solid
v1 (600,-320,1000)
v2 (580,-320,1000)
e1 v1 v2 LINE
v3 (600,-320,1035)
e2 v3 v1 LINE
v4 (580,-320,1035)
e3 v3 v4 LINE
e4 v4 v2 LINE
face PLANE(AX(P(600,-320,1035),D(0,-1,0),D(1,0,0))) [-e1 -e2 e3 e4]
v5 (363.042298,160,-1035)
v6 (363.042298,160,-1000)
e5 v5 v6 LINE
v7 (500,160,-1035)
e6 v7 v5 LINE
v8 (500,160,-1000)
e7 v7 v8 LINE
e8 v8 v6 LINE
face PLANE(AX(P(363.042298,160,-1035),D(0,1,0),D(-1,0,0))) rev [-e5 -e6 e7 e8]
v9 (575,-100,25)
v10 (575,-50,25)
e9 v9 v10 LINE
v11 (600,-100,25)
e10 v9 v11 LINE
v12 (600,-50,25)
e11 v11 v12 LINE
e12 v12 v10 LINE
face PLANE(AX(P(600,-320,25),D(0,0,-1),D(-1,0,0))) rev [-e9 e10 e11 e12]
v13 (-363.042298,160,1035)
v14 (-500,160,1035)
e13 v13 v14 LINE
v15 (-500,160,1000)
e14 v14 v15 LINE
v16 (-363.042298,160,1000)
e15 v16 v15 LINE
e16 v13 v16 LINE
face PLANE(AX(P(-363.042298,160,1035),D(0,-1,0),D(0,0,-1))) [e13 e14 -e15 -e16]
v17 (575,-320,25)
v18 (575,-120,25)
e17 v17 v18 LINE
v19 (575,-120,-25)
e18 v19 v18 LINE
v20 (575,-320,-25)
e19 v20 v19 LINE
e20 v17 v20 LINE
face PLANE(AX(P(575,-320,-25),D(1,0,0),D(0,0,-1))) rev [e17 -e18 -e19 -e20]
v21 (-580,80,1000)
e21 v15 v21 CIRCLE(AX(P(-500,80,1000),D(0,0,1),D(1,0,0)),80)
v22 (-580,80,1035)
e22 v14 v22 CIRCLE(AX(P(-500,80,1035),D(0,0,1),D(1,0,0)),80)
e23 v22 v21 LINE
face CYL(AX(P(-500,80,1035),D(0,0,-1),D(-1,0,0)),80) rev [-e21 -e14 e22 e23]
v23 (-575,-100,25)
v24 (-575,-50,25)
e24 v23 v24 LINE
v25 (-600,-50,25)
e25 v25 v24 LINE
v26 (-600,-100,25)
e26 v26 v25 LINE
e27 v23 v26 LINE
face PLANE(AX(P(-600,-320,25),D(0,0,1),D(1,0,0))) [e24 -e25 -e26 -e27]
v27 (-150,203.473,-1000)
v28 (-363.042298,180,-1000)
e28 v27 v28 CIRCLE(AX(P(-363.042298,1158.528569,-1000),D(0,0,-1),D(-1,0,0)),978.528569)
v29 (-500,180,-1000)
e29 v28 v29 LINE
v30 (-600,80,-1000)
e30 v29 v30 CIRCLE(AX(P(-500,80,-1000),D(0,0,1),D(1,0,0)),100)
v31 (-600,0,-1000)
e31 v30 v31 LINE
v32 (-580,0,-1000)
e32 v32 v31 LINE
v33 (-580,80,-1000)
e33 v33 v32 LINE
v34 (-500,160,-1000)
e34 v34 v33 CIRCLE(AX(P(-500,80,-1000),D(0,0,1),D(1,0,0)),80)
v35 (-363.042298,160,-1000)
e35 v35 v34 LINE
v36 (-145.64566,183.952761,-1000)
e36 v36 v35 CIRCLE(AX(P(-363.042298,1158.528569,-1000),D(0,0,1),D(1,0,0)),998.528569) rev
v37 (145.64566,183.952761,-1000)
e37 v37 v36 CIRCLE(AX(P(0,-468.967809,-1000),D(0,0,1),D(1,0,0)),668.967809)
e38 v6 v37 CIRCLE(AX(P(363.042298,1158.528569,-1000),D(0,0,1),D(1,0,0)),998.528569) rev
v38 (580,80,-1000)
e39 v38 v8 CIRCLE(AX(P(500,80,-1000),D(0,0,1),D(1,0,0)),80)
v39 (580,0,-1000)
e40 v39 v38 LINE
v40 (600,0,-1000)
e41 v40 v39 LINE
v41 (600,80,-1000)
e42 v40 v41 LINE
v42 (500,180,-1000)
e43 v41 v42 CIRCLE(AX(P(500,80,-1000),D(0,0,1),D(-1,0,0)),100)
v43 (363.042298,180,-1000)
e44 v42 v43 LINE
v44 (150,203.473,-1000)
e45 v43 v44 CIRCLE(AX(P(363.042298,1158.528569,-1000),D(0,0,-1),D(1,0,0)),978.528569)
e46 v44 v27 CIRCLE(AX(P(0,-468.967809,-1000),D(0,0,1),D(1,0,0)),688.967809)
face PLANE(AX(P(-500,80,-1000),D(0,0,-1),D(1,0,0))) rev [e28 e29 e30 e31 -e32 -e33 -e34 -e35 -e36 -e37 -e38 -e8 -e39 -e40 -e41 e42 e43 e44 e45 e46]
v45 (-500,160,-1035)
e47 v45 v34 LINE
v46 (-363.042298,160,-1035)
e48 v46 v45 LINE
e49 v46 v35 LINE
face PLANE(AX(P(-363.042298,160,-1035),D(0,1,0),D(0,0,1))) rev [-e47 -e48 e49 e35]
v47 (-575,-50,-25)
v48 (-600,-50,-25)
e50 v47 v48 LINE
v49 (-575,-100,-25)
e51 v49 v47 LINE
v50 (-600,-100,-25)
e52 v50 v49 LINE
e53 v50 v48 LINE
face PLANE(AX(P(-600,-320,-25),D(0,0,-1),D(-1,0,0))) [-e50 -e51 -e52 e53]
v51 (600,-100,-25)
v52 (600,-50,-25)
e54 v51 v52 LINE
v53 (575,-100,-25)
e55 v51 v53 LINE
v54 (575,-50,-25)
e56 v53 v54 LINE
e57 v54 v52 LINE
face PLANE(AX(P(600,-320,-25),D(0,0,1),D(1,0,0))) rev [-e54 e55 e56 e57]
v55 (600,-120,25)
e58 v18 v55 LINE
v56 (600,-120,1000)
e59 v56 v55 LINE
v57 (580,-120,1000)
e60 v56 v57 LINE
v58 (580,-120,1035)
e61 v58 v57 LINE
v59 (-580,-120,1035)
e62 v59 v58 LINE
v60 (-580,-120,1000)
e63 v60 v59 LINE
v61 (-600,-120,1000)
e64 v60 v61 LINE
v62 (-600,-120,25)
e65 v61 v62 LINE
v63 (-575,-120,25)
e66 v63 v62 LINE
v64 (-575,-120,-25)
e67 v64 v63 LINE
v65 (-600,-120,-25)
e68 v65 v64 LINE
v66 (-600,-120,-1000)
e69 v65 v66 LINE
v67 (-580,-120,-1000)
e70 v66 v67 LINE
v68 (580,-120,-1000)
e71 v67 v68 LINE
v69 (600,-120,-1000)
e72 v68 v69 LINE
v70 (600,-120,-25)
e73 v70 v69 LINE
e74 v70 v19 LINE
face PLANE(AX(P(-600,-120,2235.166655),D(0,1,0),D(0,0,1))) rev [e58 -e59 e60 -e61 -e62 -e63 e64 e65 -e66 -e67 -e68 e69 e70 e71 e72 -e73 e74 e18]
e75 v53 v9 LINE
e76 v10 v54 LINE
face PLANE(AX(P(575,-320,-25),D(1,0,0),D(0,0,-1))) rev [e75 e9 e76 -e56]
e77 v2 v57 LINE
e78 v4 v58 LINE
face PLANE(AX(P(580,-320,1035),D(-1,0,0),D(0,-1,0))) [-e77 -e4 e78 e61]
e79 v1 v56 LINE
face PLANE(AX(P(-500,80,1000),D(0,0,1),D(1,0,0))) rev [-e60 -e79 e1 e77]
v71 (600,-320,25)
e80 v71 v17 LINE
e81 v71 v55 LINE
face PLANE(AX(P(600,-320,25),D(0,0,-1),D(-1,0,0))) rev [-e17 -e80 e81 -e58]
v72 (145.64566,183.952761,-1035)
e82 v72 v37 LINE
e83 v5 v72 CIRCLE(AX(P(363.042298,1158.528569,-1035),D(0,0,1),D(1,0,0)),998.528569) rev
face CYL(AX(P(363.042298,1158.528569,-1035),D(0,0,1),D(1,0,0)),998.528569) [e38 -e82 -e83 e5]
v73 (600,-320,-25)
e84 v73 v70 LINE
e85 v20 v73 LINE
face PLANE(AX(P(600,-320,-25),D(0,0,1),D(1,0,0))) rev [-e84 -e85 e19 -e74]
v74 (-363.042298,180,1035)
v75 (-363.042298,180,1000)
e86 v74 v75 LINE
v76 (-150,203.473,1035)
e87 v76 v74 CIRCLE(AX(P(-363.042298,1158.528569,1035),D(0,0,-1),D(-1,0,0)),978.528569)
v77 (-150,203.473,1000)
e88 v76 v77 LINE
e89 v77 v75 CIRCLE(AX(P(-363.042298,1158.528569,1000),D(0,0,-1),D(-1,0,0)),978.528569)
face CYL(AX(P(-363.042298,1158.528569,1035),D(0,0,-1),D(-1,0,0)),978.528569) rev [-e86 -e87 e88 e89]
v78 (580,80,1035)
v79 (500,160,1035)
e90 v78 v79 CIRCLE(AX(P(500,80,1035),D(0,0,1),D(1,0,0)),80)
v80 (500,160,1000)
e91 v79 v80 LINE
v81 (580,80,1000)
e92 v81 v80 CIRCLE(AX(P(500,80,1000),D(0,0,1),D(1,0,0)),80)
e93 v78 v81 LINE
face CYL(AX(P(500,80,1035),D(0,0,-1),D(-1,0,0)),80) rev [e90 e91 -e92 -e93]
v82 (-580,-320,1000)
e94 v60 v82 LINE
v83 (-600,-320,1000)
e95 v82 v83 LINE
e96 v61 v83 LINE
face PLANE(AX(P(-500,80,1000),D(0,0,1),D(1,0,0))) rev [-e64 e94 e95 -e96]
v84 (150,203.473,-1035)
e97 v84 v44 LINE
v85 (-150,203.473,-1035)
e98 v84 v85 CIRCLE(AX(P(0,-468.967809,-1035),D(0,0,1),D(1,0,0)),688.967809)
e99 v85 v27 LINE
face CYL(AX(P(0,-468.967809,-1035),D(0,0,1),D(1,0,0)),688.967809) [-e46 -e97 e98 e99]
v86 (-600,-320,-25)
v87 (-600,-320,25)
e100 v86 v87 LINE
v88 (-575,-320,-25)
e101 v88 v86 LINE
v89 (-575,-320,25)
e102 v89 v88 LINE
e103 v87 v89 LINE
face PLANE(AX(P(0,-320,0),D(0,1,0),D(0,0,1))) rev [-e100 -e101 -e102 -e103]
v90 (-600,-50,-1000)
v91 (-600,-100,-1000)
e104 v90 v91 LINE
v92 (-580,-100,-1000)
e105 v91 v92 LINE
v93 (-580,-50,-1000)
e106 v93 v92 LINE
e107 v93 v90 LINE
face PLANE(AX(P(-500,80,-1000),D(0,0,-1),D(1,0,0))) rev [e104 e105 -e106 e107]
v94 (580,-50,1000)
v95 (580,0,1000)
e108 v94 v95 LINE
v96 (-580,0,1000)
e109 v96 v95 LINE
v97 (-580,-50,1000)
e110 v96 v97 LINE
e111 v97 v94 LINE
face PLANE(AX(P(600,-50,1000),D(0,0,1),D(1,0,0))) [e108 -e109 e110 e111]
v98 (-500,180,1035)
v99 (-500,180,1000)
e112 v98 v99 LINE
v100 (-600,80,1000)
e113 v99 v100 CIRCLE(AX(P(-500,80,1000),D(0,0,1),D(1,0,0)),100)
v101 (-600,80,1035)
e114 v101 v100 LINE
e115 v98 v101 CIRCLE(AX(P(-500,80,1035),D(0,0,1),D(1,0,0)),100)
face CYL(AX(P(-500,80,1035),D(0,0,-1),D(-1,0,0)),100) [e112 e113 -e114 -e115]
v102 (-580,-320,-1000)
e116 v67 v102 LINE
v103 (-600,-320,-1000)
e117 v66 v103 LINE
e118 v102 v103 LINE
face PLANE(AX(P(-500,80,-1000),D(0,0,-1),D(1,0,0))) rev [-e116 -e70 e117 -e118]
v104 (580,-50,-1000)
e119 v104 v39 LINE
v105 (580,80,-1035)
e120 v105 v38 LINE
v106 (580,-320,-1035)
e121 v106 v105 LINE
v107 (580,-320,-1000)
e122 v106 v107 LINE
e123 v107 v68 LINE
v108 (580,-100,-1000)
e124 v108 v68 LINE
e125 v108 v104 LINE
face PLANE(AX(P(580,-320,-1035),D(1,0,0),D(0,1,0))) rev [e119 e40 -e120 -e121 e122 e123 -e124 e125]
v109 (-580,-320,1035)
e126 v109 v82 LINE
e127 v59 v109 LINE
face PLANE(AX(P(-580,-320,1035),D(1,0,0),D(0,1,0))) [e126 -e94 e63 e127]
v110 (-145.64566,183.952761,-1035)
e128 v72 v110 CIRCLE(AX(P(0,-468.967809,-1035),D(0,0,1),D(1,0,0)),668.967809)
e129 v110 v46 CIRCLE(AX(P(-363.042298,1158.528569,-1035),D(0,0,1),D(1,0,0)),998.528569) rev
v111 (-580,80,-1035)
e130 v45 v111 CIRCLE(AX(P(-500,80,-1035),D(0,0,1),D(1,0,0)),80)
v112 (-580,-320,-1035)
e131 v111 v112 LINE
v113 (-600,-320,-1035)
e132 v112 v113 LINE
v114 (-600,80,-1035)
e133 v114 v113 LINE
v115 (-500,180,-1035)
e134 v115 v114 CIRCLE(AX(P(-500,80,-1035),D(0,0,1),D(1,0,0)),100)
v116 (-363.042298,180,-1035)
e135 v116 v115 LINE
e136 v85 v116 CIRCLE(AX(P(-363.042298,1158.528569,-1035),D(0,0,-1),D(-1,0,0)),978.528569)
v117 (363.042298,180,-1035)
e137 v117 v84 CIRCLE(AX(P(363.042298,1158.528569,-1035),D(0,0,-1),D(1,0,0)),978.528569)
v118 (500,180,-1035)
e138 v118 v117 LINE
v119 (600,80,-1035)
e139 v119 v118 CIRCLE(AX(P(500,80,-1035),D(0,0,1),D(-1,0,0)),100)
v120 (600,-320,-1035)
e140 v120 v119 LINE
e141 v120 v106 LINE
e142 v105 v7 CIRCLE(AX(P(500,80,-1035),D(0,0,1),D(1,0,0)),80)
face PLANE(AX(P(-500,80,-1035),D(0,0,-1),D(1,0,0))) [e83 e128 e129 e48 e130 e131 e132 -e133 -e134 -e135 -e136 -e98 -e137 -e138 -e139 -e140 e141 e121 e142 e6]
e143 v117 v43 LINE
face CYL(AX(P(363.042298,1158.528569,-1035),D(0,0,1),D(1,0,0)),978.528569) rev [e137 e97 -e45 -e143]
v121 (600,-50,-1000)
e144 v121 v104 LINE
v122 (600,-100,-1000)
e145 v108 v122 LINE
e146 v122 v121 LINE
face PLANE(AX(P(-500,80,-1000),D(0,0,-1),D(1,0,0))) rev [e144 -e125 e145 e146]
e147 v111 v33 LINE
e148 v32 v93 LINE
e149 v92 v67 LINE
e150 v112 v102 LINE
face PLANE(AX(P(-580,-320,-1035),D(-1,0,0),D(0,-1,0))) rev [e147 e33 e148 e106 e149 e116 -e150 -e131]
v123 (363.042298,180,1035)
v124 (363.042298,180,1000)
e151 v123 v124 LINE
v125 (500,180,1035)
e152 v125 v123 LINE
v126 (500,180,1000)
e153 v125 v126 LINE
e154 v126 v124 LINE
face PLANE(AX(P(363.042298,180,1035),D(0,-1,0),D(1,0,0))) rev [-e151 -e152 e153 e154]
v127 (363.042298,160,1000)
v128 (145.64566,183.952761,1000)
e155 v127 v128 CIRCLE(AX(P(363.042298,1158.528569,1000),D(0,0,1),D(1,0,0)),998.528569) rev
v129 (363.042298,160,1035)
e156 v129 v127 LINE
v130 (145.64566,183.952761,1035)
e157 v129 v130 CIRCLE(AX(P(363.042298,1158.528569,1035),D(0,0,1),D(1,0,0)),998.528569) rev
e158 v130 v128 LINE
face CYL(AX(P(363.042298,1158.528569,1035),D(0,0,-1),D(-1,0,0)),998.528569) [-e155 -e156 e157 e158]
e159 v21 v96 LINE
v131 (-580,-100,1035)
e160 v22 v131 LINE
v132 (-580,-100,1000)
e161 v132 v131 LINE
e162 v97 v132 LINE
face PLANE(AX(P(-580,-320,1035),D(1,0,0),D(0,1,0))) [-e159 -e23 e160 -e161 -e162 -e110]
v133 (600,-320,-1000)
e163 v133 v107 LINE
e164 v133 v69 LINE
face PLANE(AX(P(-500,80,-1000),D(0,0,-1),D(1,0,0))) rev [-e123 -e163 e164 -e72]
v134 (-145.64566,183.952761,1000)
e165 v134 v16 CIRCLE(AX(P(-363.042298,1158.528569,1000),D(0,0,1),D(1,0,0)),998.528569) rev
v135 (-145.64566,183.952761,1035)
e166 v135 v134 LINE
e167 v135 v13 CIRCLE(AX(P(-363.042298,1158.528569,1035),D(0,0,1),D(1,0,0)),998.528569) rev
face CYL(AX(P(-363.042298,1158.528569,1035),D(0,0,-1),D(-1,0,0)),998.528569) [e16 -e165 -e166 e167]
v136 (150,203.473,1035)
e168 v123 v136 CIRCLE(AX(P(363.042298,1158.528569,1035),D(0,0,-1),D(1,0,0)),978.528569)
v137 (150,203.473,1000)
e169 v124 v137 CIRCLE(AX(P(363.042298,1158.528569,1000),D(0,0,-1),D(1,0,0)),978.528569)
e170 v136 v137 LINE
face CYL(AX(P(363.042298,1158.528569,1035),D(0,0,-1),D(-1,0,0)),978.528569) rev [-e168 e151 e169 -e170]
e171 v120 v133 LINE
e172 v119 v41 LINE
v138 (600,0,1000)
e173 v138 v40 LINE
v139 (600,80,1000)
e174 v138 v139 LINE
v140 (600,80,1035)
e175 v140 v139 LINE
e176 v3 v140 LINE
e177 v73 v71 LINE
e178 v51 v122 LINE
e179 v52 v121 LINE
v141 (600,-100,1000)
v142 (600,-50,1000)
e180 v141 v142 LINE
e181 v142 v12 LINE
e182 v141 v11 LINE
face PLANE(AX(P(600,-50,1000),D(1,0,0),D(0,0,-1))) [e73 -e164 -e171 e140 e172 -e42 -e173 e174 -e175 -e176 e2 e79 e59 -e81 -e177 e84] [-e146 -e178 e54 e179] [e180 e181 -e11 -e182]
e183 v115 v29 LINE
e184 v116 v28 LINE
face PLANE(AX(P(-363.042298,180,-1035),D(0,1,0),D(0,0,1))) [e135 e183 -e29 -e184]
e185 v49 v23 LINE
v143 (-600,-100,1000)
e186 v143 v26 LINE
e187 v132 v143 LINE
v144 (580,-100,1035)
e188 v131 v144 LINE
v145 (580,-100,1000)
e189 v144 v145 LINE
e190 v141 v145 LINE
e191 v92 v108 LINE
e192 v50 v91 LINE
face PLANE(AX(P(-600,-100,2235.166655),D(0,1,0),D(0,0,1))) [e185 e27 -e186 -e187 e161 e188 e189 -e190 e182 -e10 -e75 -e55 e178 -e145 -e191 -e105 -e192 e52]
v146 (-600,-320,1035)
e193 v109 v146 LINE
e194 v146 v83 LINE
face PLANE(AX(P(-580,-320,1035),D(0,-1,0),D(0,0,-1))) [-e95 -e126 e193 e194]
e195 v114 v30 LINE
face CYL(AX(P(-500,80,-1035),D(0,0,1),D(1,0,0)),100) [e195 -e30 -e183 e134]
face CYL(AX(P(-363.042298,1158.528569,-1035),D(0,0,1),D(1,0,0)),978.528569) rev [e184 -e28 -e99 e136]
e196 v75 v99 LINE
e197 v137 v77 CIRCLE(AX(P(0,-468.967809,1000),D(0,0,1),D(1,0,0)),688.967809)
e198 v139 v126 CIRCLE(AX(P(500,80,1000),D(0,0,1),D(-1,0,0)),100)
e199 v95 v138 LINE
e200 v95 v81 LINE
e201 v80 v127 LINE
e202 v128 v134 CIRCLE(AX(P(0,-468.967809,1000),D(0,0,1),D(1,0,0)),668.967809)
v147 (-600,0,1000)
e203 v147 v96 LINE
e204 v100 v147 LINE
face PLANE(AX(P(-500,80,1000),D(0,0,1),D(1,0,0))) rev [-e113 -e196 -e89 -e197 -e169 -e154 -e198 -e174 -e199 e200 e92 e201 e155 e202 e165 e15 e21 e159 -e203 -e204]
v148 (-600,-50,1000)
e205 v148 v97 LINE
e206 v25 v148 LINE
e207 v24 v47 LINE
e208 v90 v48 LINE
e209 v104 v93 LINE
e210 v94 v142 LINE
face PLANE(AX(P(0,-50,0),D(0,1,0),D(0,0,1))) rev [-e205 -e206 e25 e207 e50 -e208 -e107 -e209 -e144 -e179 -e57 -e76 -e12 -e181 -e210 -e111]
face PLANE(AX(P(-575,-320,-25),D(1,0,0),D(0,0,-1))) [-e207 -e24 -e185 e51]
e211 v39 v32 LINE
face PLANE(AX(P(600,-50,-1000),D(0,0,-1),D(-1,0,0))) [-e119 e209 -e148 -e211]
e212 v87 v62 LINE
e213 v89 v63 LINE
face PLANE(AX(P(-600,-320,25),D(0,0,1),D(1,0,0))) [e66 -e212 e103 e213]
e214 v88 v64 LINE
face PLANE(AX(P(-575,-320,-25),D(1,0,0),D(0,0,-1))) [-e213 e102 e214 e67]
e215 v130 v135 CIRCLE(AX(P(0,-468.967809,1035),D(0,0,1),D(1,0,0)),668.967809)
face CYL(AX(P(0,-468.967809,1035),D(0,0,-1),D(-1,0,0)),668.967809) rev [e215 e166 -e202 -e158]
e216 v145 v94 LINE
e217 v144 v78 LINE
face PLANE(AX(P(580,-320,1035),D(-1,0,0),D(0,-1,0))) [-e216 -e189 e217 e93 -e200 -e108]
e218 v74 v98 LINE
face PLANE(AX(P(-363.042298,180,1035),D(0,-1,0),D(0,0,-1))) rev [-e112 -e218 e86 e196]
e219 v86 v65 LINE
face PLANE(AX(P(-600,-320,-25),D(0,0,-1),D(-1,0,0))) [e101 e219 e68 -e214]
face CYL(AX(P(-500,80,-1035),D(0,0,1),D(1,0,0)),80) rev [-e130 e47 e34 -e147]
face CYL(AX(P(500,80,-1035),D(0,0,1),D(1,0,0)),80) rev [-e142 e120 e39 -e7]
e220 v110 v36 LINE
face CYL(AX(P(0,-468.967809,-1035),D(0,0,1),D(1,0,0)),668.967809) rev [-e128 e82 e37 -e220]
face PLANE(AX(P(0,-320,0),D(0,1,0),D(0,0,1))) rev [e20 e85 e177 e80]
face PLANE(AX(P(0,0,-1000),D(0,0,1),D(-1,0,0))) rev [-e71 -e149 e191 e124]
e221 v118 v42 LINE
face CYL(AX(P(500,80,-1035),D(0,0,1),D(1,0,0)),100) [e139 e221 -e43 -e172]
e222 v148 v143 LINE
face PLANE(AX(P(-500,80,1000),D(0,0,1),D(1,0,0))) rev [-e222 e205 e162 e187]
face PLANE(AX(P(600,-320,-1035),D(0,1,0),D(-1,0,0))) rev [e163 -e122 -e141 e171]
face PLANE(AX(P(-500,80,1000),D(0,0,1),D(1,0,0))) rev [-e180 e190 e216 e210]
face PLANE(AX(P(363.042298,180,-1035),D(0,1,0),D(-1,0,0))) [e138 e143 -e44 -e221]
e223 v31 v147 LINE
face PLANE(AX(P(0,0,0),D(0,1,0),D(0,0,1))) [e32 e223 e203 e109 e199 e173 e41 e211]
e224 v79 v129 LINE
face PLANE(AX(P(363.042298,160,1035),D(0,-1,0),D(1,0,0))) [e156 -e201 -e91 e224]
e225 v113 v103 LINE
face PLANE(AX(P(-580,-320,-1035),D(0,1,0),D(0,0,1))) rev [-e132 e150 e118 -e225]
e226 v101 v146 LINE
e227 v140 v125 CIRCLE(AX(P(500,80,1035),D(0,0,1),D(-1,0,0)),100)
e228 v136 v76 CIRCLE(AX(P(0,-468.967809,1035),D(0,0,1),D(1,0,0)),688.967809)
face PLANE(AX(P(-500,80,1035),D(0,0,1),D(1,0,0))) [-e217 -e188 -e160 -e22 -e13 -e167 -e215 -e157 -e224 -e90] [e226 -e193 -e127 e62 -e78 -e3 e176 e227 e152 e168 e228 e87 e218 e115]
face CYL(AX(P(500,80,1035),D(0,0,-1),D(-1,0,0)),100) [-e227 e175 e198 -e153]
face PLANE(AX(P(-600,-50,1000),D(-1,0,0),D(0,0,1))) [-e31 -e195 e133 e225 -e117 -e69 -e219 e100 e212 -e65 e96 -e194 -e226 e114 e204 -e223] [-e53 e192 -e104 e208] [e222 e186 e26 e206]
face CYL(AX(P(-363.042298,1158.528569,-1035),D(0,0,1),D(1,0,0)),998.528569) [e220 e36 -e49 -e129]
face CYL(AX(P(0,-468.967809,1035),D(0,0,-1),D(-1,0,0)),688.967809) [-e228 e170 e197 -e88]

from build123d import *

# Parameters (mm, degrees)
SKETCH_1_W         = 1200
SKETCH_1_H         = 2000
EXTRUDE_1_DEPTH    = 50
SKETCH_2_W         = 25
SKETCH_2_H         = 50
EXTRUDE_2_DEPTH    = 320
EXTRUDE_1_2_DEPTH  = 35
SKETCH_4_W         = 1200
SKETCH_4_H         = 20
EXTRUDE_3_DEPTH    = 35
MIRROR_START       = -1000
MIRROR_2_OUTLINE_W = 1200
MIRROR_2_OUTLINE_H = 20
MIRROR_2_DEPTH     = 2000
MIRROR_START_2     = -1035
MIRROR_2_2_DEPTH   = 35


# Read off the part's stored shape, not the designer's step: 镜向2
with BuildPart() as part:
    # 草图1 → Extrude 1 (new body)
    with BuildSketch(Plane(origin=(0, 0, 0), x_dir=(1, 0, 0), z_dir=(0, 1, 0))):
        Rectangle(SKETCH_1_W, SKETCH_1_H)
    extrude(amount=-EXTRUDE_1_DEPTH)

    # 草图2 → 凸台-拉伸2 (add)
    with BuildSketch(Plane(origin=(0, 0, 0), x_dir=(1, 0, 0), z_dir=(0, 1, 0))):
        with Locations((-587.5, 0)):
            Rectangle(SKETCH_2_W, SKETCH_2_H)
    extrude_2 = extrude(amount=-EXTRUDE_2_DEPTH)

    # 镜向1: 凸台-拉伸2 across plane
    add(extrude_2.mirror(Plane(origin=(0, 0, 0), x_dir=(0, 0, 1), z_dir=(1, 0, 0))))

    # 草图3 → Extrude 1 2 (add)
    with BuildSketch(Plane.XY.offset(1000)):
        with BuildLine():
            Line((-600, -320), (-600, 80))
            ThreePointArc((-600, 80), (-570.710678119, 150.710678119), (-500, 180))
            Line((-500, 180), (-363.0422981, 180))
            ThreePointArc((-363.0422981, 180), (-255.876535707, 185.885952353), (-150, 203.473000167))
            ThreePointArc((-150, 203.473000167), (0, 220), (150, 203.473000167))
            ThreePointArc((150, 203.473000167), (255.876535707, 185.885952353), (363.0422981, 180))
            Line((363.0422981, 180), (500, 180))
            ThreePointArc((500, 180), (570.710678119, 150.710678119), (600, 80))
            Line((600, 80), (600, -320))
            Line((600, -320), (580, -320))
            Line((580, -320), (580, 80))
            ThreePointArc((580, 80), (556.568542495, 136.568542495), (500, 160))
            Line((500, 160), (363.0422981, 160))
            ThreePointArc((363.0422981, 160), (253.686190615, 166.006254459), (145.645660129, 183.952761329))
            ThreePointArc((145.645660129, 183.952761329), (0, 200), (-145.645660129, 183.952761329))
            ThreePointArc((-145.645660129, 183.952761329), (-253.686190615, 166.006254459), (-363.0422981, 160))
            Line((-363.0422981, 160), (-500, 160))
            ThreePointArc((-500, 160), (-556.568542495, 136.568542495), (-580, 80))
            Line((-580, 80), (-580, -320))
            Line((-580, -320), (-600, -320))
        make_face()
    extrude(amount=EXTRUDE_1_2_DEPTH)

    # 草图4 → 拉伸-薄壁3 (add)
    with BuildSketch(Plane.XY.offset(1000)):
        with Locations((0, -110)):
            Rectangle(SKETCH_4_W, SKETCH_4_H)
    extrude(amount=EXTRUDE_3_DEPTH)

    # 镜向2 outline → 镜向2 (add)
    with BuildSketch(Plane.XY.offset(MIRROR_START)):
        with Locations((0, -110)):
            Rectangle(MIRROR_2_OUTLINE_W, MIRROR_2_OUTLINE_H)
    extrude(amount=MIRROR_2_DEPTH)

    # Mirror 2 2 outline → Mirror 2 2 (add)
    with BuildSketch(Plane.XY.offset(MIRROR_START_2)):
        with BuildLine():
            ThreePointArc((-580, 80), (-556.568542495, 136.568542495), (-500, 160))
            Line((-500, 160), (-363.0422981, 160))
            ThreePointArc((-363.0422981, 160), (-253.686190616, 166.006254459), (-145.645660129, 183.952761329))
            ThreePointArc((-145.645660129, 183.952761329), (0, 200), (145.645660129, 183.952761329))
            ThreePointArc((145.645660129, 183.952761329), (253.686190616, 166.006254459), (363.0422981, 160))
            Line((363.0422981, 160), (500, 160))
            ThreePointArc((500, 160), (556.568542495, 136.568542495), (580, 80))
            Line((580, 80), (580, -320))
            Line((580, -320), (600, -320))
            Line((600, -320), (600, 80))
            ThreePointArc((600, 80), (570.710678119, 150.710678119), (500, 180))
            Line((500, 180), (363.0422981, 180))
            ThreePointArc((363.0422981, 180), (255.876535708, 185.885952353), (150, 203.473000167))
            ThreePointArc((150, 203.473000167), (0, 220), (-150, 203.473000167))
            ThreePointArc((-150, 203.473000167), (-255.876535708, 185.885952353), (-363.0422981, 180))
            Line((-363.0422981, 180), (-500, 180))
            ThreePointArc((-500, 180), (-570.710678119, 150.710678119), (-600, 80))
            Line((-600, 80), (-600, -320))
            Line((-600, -320), (-580, -320))
            Line((-580, -320), (-580, 80))
        make_face()
    extrude(amount=MIRROR_2_2_DEPTH)


solid = part.part
